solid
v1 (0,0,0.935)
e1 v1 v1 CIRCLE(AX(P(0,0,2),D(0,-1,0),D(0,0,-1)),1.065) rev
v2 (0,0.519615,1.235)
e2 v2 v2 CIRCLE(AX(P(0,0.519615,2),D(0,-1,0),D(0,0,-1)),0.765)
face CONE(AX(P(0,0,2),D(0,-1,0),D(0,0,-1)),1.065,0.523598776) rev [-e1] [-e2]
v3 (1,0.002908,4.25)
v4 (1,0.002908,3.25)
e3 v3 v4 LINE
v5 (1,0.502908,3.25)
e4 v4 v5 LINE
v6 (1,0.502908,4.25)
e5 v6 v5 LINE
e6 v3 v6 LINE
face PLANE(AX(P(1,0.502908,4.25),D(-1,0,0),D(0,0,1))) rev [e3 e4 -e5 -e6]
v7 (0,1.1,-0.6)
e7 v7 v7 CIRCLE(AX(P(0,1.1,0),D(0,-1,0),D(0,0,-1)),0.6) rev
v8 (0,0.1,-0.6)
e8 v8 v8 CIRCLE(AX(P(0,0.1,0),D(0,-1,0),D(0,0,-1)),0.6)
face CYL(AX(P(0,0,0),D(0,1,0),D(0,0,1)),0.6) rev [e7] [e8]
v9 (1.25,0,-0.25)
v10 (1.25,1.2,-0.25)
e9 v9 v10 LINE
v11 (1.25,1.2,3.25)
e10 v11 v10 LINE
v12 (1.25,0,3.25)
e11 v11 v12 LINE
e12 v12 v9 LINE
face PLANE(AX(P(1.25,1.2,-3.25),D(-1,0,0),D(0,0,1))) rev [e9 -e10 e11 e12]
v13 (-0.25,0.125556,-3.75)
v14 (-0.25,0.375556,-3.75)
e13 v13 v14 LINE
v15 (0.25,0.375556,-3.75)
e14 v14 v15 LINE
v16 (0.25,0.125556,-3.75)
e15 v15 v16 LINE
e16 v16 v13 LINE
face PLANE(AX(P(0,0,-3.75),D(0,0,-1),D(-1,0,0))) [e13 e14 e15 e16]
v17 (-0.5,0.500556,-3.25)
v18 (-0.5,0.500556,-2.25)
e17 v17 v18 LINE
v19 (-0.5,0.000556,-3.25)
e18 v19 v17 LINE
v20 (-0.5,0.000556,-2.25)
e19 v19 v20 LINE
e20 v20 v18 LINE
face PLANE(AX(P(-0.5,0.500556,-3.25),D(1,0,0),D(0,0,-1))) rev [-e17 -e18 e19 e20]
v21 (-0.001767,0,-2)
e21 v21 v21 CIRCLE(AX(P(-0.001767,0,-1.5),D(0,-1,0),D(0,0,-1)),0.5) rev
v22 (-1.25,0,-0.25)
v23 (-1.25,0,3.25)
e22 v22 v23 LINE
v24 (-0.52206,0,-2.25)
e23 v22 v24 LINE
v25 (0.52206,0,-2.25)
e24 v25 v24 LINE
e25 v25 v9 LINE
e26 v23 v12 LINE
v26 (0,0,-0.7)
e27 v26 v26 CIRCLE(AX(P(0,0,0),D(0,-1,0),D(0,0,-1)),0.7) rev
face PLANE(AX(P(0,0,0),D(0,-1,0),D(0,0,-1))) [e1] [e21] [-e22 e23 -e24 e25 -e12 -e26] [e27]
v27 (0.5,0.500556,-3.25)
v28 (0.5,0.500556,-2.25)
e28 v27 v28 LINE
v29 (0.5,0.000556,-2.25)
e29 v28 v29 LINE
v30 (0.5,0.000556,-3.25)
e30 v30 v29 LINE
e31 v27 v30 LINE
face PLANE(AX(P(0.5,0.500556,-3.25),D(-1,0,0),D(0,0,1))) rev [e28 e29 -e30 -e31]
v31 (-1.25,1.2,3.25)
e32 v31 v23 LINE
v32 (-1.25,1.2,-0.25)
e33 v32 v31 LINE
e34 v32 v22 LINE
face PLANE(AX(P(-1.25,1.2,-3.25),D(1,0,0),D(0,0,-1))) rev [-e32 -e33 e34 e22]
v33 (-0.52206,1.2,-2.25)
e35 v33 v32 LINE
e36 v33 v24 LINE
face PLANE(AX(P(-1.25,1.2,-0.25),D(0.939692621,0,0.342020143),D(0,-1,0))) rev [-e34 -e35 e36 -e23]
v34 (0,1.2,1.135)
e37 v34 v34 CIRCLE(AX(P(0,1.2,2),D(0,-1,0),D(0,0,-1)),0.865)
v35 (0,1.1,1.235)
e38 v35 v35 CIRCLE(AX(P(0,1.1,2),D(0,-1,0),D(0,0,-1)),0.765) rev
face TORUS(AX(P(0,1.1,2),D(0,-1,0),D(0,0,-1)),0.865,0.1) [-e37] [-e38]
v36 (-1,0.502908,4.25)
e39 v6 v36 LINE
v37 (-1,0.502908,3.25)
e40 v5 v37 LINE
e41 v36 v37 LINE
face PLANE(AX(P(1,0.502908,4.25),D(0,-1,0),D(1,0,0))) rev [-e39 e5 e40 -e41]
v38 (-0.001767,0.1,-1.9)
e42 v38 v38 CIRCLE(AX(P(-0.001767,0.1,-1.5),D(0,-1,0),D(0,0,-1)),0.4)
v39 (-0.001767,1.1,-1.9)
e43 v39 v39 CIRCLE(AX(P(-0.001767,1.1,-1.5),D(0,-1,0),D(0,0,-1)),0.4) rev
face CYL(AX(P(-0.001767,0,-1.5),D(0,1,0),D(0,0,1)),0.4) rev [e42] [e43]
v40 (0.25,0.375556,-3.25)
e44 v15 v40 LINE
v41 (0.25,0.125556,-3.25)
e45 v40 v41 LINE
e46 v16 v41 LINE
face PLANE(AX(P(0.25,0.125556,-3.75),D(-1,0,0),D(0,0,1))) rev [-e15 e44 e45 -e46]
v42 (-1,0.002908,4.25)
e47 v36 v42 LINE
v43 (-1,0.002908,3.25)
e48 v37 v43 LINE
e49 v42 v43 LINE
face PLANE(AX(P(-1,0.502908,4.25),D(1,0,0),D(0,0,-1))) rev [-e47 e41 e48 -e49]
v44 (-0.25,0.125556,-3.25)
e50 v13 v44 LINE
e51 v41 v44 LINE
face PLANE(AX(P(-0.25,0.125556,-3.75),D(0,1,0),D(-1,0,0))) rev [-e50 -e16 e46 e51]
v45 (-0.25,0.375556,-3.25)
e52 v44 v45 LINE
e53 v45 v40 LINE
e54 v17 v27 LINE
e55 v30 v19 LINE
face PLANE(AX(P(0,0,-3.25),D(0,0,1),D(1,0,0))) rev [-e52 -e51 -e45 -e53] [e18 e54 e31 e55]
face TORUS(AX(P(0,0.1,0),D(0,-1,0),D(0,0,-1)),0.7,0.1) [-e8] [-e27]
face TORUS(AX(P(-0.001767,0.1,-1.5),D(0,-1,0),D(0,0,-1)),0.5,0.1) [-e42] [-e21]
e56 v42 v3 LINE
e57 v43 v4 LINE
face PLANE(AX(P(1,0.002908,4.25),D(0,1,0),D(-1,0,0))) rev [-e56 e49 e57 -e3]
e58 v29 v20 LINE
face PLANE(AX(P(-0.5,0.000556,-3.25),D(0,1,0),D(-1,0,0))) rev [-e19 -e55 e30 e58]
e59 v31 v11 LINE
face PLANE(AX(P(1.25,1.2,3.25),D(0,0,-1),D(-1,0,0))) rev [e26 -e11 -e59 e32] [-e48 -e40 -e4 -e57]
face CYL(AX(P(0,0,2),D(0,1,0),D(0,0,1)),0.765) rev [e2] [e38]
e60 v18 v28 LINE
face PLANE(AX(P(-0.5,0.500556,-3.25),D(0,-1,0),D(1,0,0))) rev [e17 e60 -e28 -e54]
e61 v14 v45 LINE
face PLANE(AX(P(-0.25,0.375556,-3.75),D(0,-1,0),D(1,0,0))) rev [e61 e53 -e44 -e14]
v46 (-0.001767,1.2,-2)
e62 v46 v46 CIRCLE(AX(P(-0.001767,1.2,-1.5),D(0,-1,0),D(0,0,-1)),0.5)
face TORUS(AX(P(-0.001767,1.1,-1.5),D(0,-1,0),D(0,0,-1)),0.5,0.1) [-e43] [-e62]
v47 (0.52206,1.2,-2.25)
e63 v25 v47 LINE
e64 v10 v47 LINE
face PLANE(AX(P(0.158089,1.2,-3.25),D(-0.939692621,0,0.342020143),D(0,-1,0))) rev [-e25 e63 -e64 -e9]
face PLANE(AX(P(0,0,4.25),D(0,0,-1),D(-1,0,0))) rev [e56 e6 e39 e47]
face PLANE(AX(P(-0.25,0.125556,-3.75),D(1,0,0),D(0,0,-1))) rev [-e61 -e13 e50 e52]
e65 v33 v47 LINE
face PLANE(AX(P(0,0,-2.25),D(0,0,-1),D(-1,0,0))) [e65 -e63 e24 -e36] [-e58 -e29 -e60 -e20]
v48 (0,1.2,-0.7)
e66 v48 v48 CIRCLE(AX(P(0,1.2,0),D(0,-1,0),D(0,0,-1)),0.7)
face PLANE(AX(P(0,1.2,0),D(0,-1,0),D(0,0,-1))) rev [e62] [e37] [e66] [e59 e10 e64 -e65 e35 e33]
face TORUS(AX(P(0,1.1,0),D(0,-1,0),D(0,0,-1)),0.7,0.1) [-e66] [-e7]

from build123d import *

# Parameters (mm, degrees)
SKETCH1_W           = 2.5
SKETCH1_H           = 6.5
BOSS_EXTRUDE1_DEPTH = 1.2
SKETCH2_R           = 0.6
SKETCH2_R_2         = 0.765
SKETCH2_R_3         = 0.4
CUT_EXTRUDE1_DEPTH  = 1.2
CHAMFER1_SIZE       = 3
CHAMFER1_SIZE2      = 1.091910703
CHAMFER2_SIZE       = 3
CHAMFER2_SIZE2      = 1.091910703
SKETCH3_W           = 2.5
SKETCH3_H           = 1.2
CUT_EXTRUDE2_DEPTH  = 1
CHAMFER3_SIZE       = 0.3
CHAMFER3_SIZE2      = 0.519615242
FILLET1_R           = 0.1
SKETCH4_W           = 1
SKETCH4_H           = 0.5
BOSS_EXTRUDE2_DEPTH = 1
SKETCH5_W           = 2
SKETCH5_H           = 0.5
BOSS_EXTRUDE3_DEPTH = 1
SKETCH6_W           = 0.5
SKETCH6_H           = 0.25
BOSS_EXTRUDE4_DEPTH = 0.5
SKETCH8_W           = 1
SKETCH8_H           = 0.25
BOSS_EXTRUDE6_DEPTH = 0.5
SKETCH9_W           = 2.896936236
SKETCH9_H           = 1.571826666
CUT_EXTRUDE3_DEPTH  = 129.011727979


# Read off the part's stored shape, not the designer's step: Mirror2, Mirror4, Mirror6, Mirror7
with BuildPart() as part:
    # Sketch1 → Boss-Extrude1 (new body)
    with BuildSketch(Plane(origin=(0, 0, 0), x_dir=(1, 0, 0), z_dir=(0, 1, 0))):
        Rectangle(SKETCH1_W, SKETCH1_H)
    extrude(amount=BOSS_EXTRUDE1_DEPTH)

    # Sketch2 → Cut-Extrude1 (cut)
    with BuildSketch(Plane(origin=(0, 1.2, 0), x_dir=(1, 0, 0), z_dir=(0, 1, 0))):
        with Locations(Location((0, 0, 0), (0, 0, 270))):
            Circle(SKETCH2_R)
        with Locations(Location((0, -2, 0), (0, 0, 270))):
            Circle(SKETCH2_R_2)
        with Locations(Location((-0.001766606, 1.5, 0), (0, 0, 270))):
            Circle(SKETCH2_R_3)
    extrude(amount=-CUT_EXTRUDE1_DEPTH, mode=Mode.SUBTRACT)

    # Chamfer1
    chamfer1_edges = [part.edges().sort_by_distance(p)[0] for p in [
        (1.25, 0.6, -3.25),
    ]]
    chamfer1_side = [part.faces().sort_by_distance(p)[0] for p in [
        (1.25, 0.6, 0),
    ]]
    chamfer(chamfer1_edges, length=CHAMFER1_SIZE, length2=CHAMFER1_SIZE2, reference=chamfer1_side[0])

    # Chamfer2
    chamfer2_edges = [part.edges().sort_by_distance(p)[0] for p in [
        (-1.25, 0.6, -3.25),
    ]]
    chamfer2_side = [part.faces().sort_by_distance(p)[0] for p in [
        (-1.25, 0.6, 0),
    ]]
    chamfer(chamfer2_edges, length=CHAMFER2_SIZE, length2=CHAMFER2_SIZE2, reference=chamfer2_side[0])

    # Sketch3 → Cut-Extrude2 (cut)
    with BuildSketch(Plane(origin=(0, 0, -3.25), x_dir=(-1, 0, 0), z_dir=(0, 0, -1))):
        with Locations((0, 0.6)):
            Rectangle(SKETCH3_W, SKETCH3_H)
    extrude(amount=-CUT_EXTRUDE2_DEPTH, mode=Mode.SUBTRACT)

    # Chamfer3
    chamfer3_edges = [part.edges().sort_by_distance(p)[0] for p in [
        (0, 0, 1.235),
    ]]
    chamfer3_side = [part.faces().sort_by_distance(p)[0] for p in [
        (0.000100657, 0, 0.709259096),
    ]]
    chamfer(chamfer3_edges, length=CHAMFER3_SIZE, length2=CHAMFER3_SIZE2, reference=chamfer3_side[0])

    # Fillet1
    fillet1_edges = [part.edges().sort_by_distance(p)[0] for p in [
        (0, 0, -0.6),
        (0, 1.2, -0.6),
        (0, 1.2, 1.235),
        (-0.001766606, 0, -1.9),
        (-0.001766606, 1.2, -1.9),
    ]]
    fillet(fillet1_edges, radius=FILLET1_R)

    # Sketch4 → Boss-Extrude2 (add)
    with BuildSketch(Plane(origin=(0, 0, -2.25), x_dir=(-1, 0, 0), z_dir=(0, 0, -1))):
        with Locations((0, 0.250555681)):
            Rectangle(SKETCH4_W, SKETCH4_H)
    extrude(amount=BOSS_EXTRUDE2_DEPTH)

    # Sketch5 → Boss-Extrude3 (add)
    with BuildSketch(Plane.XY.offset(3.25)):
        with Locations((0, 0.252908482)):
            Rectangle(SKETCH5_W, SKETCH5_H)
    extrude(amount=BOSS_EXTRUDE3_DEPTH)

    # Sketch6 → Boss-Extrude4 (add)
    with BuildSketch(Plane(origin=(0, 0, -3.25), x_dir=(-1, 0, 0), z_dir=(0, 0, -1))):
        with Locations((0, 0.250555681)):
            Rectangle(SKETCH6_W, SKETCH6_H)
    extrude(amount=BOSS_EXTRUDE4_DEPTH)

    # Sketch8 → Boss-Extrude6 (add)
    with BuildSketch(Plane.XY.offset(4.25)):
        with Locations((0, 0.252908482)):
            Rectangle(SKETCH8_W, SKETCH8_H)
    extrude(amount=BOSS_EXTRUDE6_DEPTH)

    # Mirror2: part across plane


with BuildPart() as part_1:
    add(part.part)
    add(part.part.mirror(Plane(origin=(0, 0, 4.75), x_dir=(1, 0, 0), z_dir=(0, 0, -1))))

    # Mirror4: part across plane


with BuildPart() as part_2:
    add(part_1.part)
    add(part_1.part.mirror(Plane.XY.offset(13.25)))

    # Mirror6: part across plane


with BuildPart() as part_3:
    add(part_2.part)
    add(part_2.part.mirror(Plane.XY.offset(30.25)))

    # Mirror7: part across plane


with BuildPart() as part_4:
    add(part_3.part)
    add(part_3.part.mirror(Plane.XY.offset(64.25)))

    # Sketch9 → Cut-Extrude3 (cut, through all)
    with BuildSketch(Plane.XY.offset(4.25)):
        with Locations((0.013927578, 0.592041384)):
            Rectangle(SKETCH9_W, SKETCH9_H)
    extrude(amount=CUT_EXTRUDE3_DEPTH, mode=Mode.SUBTRACT)


solid = part_4.part
